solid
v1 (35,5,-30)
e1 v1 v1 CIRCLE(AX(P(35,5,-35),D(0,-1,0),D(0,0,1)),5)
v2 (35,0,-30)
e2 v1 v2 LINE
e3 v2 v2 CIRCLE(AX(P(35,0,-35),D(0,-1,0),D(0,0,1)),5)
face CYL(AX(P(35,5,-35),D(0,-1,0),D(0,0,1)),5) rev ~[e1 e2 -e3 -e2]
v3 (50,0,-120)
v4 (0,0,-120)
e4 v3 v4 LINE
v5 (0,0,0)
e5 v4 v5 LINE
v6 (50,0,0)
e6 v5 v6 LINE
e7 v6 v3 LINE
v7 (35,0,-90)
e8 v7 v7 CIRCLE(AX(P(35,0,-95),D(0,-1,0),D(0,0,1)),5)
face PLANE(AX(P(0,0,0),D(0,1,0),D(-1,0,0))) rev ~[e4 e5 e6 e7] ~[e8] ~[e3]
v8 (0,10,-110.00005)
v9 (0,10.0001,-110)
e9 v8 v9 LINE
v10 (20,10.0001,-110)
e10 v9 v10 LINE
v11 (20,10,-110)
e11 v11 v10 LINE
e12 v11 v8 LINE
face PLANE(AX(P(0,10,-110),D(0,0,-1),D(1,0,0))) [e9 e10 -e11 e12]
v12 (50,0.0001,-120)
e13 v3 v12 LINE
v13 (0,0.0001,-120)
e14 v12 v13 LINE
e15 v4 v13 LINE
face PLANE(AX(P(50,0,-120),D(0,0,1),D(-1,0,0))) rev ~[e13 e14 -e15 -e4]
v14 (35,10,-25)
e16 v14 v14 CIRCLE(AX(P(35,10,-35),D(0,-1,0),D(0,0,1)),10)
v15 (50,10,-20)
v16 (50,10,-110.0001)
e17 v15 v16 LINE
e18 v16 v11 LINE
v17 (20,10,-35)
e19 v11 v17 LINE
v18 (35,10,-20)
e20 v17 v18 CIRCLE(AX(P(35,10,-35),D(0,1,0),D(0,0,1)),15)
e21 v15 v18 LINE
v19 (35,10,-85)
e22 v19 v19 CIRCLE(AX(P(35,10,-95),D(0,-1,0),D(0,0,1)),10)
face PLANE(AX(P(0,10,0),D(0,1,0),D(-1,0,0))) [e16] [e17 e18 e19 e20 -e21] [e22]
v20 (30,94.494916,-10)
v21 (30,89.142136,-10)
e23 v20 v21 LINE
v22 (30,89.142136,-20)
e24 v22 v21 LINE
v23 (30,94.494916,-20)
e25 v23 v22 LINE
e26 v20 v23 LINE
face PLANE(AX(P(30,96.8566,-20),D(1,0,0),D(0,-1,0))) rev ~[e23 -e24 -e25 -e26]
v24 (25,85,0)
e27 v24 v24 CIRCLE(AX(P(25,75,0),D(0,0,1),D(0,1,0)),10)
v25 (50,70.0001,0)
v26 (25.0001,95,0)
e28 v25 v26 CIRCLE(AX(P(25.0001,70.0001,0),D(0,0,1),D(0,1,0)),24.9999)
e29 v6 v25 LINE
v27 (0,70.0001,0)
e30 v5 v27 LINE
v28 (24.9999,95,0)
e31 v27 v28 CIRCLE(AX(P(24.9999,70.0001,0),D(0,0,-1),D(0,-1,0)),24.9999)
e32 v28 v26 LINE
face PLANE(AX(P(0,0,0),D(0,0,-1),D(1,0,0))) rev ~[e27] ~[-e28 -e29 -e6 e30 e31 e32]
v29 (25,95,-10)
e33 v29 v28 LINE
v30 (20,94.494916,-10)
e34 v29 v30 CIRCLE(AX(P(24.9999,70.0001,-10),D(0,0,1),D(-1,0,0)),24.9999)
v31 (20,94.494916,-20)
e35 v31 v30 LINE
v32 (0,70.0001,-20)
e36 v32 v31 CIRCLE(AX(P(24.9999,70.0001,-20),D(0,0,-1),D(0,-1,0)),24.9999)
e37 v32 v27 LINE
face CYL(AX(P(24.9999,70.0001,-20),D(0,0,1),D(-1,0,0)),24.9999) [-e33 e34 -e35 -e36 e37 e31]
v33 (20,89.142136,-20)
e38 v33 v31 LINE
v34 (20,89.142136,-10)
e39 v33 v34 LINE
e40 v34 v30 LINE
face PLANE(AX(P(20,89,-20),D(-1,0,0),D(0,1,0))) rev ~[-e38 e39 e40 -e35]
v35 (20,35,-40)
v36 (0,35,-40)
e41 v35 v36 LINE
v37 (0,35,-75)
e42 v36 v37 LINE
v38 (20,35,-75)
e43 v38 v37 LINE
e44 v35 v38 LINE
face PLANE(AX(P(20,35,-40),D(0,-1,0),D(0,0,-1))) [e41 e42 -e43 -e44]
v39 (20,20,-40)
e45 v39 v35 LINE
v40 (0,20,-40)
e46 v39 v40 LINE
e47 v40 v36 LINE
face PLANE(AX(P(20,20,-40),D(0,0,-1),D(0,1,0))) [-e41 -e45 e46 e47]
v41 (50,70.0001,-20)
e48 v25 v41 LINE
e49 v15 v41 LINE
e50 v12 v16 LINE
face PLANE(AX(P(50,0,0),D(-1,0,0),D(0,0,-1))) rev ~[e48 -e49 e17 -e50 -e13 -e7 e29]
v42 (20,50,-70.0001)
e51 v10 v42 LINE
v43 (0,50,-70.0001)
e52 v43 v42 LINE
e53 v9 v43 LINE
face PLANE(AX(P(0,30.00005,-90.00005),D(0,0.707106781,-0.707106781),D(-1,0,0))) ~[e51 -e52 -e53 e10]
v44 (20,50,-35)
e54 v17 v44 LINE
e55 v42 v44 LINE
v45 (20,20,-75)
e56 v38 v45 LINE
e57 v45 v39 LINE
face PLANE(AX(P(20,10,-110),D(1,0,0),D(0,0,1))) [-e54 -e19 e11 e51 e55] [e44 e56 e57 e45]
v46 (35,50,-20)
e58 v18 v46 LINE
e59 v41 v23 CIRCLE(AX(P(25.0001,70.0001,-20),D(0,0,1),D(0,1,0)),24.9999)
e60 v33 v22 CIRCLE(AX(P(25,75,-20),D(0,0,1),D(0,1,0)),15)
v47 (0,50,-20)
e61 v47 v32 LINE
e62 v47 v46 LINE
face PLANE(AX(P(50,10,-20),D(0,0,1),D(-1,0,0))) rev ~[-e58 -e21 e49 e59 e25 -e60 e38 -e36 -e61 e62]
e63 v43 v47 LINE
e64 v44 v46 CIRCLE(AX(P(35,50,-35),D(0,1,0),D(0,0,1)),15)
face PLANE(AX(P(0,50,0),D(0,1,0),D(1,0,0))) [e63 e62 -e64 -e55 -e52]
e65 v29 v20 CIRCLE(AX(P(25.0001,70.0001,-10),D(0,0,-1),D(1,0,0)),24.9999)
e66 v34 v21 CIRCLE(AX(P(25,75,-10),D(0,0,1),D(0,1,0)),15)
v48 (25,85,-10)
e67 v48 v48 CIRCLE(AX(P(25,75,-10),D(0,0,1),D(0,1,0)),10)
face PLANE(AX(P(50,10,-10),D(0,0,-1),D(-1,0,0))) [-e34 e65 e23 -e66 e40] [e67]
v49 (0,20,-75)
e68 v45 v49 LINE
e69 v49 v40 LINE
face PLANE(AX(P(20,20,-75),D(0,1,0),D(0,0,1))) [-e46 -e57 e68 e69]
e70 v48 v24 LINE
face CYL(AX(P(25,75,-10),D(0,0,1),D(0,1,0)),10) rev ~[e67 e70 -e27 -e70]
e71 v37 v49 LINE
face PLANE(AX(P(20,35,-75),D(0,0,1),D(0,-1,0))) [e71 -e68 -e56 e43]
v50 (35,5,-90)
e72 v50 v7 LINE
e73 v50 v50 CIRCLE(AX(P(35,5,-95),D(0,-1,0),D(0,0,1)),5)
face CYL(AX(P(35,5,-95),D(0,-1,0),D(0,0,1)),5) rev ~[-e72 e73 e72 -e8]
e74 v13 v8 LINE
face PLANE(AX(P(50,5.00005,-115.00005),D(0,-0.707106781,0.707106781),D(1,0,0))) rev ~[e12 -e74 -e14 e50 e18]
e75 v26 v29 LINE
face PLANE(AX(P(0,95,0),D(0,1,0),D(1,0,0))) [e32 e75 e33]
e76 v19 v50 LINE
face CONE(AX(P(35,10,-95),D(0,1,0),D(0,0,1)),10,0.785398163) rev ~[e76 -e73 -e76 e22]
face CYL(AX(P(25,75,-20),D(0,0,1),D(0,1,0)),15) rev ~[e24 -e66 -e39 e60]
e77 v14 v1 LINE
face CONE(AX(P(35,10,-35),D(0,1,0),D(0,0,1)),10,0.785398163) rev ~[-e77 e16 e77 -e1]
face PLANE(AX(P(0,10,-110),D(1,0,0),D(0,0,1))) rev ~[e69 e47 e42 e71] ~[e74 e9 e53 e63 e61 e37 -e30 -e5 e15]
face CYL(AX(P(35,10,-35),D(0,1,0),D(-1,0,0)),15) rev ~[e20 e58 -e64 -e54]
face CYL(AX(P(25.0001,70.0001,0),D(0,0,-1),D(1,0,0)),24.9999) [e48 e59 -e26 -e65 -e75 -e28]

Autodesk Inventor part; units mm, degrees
ref_plane "YZ Plane" through (0, 0, 0) normal (1, 0, 0) x (0, 1, 0)
ref_plane "XZ Plane" through (0, 0, 0) normal (0, 1, 0) x (-1, 0, 0)
ref_plane "XY Plane" through (0, 0, 0) normal (0, 0, 1) x (1, 0, 0)
sketch "Sketch1" plane through (0, 0, 0) normal (0, 1, 0) x (-1, 0, 0)
  line L0 (0, 0) -> (-50, 0)
  line L1 (-50, 0) -> (-50, -120)
  line L2 (-50, -120) -> (0, -120)
  line L3 (0, -120) -> (0, 0)
  dimension "d0" = 50
  dimension "d1" = 120
extrude "Extrusion1" add sketch "Sketch1" along normal blind 10
sketch "Sketch2" plane through (0, 10, 0) normal (0, 1, 0) x (1, 0, 0)
  line L0 (0, 0) -> (50, 0)
  line L1 (50, 0) -> (50, 20)
  line L2 (50, 20) -> (0, 20)
  line L3 (0, 20) -> (0, 0)
  dimension "d4" = 50
  dimension "d5" = 20
extrude "Extrusion2" add sketch "Sketch2" along normal blind 85
chamfer "Chamfer1" distance 10 angle 45 1 edges at (25, 10, -120)
sketch "Sketch3" plane through (0, 10, 0) normal (0, 1, 0) x (1, 0, 0)
  line L0 (0, 110) -> (0, 20) projected
  line L1 (0, 20) -> (50, 20) projected
  line L2 (0, 110) -> (20, 110)
  line L3 (20, 110) -> (20, 20)
  line L4 (20, 20) -> (0, 20)
  line L5 (0, 20) -> (0, 110)
  point P0 (0, 0)
  dimension "d11" = 20
extrude "Extrusion3" add sketch "Sketch3" along normal blind 40
chamfer "Chamfer2" distance 40 angle 45 1 edges at (10, 50, -110)
fillet "Fillet1" radius 15 1 edges at (20, 30, -20)
sketch "Sketch4" plane through (50, 95, -20) normal (0, 0, -1) x (-1, 0, 0)
  point P0 (50, -95)
  point P1 (25, -20)
hole "Hole1" at (25, 75, -20) direction (0, 0, 1) diameter 20 depth 20 tip angle 118 counterbore diameter 30 counterbore depth 10
fillet "Fillet2" radius 25 2 edges at (50, 95, -10) (0, 95, -10)
sketch "Sketch5" plane through (0, 10, 0) normal (0, 1, 0) x (1, 0, 0)
  line L0 (35, 35) -> (35, 95)
  point P0 (0, 0)
  dimension "d26" = 60
hole "Hole2" at (35, 10, -35) at (35, 10, -95) direction (0, -1, 0) diameter 10 depth 10 tip angle 118 countersink diameter 20 countersink angle 90
sketch "Sketch6" plane through (50, 10, -20) normal (0, 0, -1) x (-1, 0, 0)
  line L0 (20, 79) -> (30, 79)
  line L1 (30, 79) -> (30, 86.8566)
  line L2 (30, 86.8566) -> (20, 86.8566)
  line L3 (20, 86.8566) -> (20, 79)
  point P0 (50, -10)
extrude "Extrusion4" cut sketch "Sketch6" against normal blind 10
sketch "Sketch7" plane through (20, 10, -35) normal (1, 0, 0) x (0, 0, -1)
  line L0 (5, 25) -> (40, 25)
  line L1 (40, 25) -> (40, 10)
  line L2 (40, 10) -> (5, 10)
  line L3 (5, 10) -> (5, 25)
  point P0 (-35, -10)
extrude "Extrusion5" cut sketch "Sketch7" against normal blind 20
properties part number "Part1 Drawing"
